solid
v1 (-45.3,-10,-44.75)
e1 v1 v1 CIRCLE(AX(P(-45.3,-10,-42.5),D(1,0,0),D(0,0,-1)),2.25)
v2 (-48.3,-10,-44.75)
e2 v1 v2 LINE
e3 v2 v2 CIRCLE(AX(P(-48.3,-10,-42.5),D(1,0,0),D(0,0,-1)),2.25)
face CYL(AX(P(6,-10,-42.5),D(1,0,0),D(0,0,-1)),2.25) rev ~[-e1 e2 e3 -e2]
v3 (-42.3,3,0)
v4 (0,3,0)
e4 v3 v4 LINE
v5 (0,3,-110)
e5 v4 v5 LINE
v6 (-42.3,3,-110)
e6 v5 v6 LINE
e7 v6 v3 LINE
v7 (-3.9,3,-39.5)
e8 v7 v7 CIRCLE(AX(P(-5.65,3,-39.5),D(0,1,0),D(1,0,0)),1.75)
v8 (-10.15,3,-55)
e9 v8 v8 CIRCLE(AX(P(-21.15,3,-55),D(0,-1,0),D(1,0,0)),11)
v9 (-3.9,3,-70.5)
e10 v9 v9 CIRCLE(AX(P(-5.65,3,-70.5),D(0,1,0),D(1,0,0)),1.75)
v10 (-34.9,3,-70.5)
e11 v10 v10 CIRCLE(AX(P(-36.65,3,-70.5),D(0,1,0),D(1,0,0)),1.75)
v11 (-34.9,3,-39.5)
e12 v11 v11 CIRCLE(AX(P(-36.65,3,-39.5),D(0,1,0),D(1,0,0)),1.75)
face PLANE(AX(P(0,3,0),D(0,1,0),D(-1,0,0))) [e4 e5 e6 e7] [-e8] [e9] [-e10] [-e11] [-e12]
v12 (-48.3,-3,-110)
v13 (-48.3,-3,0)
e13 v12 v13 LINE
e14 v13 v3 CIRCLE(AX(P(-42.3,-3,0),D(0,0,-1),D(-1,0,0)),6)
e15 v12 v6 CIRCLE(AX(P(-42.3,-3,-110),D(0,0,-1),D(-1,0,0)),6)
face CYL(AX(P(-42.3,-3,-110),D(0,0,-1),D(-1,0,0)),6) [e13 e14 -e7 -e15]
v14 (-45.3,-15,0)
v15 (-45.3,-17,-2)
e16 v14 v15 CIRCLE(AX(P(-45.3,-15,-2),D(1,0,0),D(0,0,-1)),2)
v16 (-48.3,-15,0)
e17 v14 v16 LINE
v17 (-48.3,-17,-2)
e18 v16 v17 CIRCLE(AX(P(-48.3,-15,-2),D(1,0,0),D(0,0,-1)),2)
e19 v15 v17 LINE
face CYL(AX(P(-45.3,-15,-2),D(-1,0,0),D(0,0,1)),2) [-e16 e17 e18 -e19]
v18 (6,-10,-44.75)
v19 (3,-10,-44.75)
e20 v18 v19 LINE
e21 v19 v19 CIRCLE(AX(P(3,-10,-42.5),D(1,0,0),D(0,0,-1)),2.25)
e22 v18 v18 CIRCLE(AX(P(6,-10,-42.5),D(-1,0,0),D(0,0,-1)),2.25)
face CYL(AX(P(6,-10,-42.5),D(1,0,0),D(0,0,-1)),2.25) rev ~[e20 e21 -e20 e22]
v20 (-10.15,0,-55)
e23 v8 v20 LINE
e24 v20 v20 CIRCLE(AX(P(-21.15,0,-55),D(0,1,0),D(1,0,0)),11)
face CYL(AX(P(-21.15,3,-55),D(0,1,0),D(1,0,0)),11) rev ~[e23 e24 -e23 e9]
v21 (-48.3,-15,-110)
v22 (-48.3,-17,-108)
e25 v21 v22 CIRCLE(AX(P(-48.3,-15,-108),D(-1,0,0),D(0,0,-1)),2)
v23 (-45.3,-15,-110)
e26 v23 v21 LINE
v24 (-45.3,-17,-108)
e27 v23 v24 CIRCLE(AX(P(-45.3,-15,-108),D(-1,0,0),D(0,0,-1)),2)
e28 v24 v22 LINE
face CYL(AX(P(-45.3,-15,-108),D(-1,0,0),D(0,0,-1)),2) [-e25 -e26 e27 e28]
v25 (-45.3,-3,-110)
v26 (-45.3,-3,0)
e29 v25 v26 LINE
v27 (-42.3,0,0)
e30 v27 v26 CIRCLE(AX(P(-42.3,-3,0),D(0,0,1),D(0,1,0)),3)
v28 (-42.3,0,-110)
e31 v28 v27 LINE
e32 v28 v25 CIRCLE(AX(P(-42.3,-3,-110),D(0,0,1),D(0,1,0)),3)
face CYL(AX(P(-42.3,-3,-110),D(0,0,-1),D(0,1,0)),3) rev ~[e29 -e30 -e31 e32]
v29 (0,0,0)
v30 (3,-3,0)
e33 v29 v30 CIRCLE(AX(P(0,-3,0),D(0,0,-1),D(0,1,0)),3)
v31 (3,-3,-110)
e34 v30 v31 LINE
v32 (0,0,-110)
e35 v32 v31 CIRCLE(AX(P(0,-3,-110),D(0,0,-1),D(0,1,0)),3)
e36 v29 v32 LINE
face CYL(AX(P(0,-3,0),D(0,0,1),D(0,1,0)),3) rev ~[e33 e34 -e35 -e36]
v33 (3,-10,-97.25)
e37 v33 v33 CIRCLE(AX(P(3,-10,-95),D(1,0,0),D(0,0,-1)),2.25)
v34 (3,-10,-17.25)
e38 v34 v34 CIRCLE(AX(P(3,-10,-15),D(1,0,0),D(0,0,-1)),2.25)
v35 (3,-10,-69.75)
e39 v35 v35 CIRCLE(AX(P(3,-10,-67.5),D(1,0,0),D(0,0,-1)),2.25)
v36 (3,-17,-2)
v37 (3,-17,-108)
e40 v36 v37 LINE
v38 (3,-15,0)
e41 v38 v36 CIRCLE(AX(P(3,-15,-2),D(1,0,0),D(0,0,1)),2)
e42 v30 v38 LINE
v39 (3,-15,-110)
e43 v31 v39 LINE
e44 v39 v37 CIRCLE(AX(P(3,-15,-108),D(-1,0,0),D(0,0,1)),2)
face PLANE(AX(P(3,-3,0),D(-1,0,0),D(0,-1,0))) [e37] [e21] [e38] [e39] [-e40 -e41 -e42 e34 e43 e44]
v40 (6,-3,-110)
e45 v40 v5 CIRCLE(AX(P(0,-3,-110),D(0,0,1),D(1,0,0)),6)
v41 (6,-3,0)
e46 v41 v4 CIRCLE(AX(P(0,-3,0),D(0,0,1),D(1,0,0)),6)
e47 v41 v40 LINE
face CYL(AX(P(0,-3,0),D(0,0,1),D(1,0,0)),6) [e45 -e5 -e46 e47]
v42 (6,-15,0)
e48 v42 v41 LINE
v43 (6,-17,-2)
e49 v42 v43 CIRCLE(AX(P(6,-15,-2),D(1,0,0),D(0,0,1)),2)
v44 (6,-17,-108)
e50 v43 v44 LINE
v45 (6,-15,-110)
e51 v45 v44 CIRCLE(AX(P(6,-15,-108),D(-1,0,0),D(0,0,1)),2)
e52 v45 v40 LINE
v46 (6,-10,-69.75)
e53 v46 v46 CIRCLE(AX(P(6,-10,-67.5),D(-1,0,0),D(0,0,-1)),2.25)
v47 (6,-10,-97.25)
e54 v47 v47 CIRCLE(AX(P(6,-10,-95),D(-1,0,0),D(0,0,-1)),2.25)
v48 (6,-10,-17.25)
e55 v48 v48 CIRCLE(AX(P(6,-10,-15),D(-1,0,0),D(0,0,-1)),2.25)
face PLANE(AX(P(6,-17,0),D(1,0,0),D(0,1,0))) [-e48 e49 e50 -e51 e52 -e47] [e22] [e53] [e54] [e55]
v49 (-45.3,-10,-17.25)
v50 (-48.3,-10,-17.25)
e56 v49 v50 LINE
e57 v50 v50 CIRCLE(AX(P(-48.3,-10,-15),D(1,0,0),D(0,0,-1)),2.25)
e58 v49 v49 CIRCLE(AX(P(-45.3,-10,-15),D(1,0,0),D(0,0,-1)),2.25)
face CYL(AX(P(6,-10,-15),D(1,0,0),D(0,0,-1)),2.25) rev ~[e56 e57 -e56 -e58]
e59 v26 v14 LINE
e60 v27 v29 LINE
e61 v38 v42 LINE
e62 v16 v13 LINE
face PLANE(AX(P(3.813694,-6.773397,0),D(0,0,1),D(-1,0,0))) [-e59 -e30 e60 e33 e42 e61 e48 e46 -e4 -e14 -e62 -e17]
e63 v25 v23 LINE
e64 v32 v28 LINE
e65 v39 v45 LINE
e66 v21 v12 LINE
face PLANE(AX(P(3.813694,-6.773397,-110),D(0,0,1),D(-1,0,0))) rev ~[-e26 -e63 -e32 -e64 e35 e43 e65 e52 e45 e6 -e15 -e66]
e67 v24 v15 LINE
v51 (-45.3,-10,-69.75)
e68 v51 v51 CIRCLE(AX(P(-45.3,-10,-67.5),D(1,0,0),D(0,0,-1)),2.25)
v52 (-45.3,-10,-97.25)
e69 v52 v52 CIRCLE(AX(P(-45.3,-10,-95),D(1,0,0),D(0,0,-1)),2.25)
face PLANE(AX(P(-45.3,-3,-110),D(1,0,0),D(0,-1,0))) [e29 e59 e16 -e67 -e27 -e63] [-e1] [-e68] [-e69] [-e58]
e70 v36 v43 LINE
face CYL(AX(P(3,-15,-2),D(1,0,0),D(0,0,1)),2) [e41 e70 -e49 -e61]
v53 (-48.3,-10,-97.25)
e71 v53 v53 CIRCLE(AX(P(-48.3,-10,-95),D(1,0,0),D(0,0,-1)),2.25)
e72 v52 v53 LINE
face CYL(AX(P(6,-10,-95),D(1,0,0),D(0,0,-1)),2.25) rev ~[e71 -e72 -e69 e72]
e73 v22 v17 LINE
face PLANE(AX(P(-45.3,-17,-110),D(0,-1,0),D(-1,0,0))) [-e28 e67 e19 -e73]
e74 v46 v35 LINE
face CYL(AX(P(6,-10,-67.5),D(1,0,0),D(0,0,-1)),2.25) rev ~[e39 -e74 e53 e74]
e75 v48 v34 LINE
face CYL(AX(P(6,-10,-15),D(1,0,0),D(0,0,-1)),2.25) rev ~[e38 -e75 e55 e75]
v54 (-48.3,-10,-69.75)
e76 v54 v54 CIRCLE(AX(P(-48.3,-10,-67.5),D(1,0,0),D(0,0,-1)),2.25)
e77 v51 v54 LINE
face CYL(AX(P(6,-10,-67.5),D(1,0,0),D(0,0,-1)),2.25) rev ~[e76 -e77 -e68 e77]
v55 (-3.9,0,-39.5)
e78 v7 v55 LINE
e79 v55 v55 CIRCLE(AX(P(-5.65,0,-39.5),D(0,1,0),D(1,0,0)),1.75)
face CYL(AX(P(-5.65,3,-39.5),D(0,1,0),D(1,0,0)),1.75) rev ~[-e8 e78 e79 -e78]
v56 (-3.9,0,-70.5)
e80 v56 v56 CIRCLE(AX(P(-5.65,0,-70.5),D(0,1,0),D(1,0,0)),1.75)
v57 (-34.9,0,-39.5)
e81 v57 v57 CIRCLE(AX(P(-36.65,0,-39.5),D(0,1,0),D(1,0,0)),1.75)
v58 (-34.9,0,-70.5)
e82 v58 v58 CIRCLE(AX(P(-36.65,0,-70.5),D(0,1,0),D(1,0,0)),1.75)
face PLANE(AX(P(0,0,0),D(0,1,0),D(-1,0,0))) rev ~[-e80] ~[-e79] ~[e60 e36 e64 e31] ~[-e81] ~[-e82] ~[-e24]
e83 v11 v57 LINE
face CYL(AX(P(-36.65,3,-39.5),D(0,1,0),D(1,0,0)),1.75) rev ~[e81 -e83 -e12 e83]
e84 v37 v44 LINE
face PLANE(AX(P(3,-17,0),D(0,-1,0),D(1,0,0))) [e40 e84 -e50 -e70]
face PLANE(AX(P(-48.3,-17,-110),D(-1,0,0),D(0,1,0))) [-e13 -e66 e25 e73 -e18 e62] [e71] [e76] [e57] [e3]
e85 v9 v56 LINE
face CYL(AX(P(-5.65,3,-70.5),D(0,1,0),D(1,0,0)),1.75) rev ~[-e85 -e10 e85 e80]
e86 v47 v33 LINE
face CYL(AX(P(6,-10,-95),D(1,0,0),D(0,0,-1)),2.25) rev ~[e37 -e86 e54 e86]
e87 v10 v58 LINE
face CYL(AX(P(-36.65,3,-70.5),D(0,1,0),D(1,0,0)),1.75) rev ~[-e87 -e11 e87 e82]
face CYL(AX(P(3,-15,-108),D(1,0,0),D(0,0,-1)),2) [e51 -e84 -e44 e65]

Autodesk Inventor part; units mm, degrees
ref_plane "YZ Plane" through (0, 0, 0) normal (1, 0, 0) x (0, 1, 0)
ref_plane "XZ Plane" through (0, 0, 0) normal (0, 1, 0) x (-1, 0, 0)
ref_plane "XY Plane" through (0, 0, 0) normal (0, 0, 1) x (1, 0, 0)
sketch "Skizze1" plane through (0, 0, 0) normal (0, 1, 0) x (-1, 0, 0)
  line L0 (42.3, 0) -> (0, 0)
  line L1 (0, 0) -> (0, -110)
  line L2 (0, -110) -> (42.3, -110)
  line L3 (42.3, -110) -> (42.3, 0)
  dimension "d0" = 110
  dimension "d1" = 42.3
extrude "Extrusion1" add sketch "Skizze1" along normal blind 3
sketch "Skizze2" plane through (0, 3, 0) normal (0, 1, 0) x (1, 0, 0)
  line L0 (-42.3, 110) -> (-42.3, 0) projected
  line L1 (-42.3, 55) -> (0, 55)
  line L2 (0, 0) -> (0, 110) projected
  line L3 (-42.3, 0) -> (0, 0) projected
  line L4 (-21.15, 0) -> (-21.15, 110)
  line L5 (0, 110) -> (-42.3, 110) projected
  circle A0 centre (-21.15, 55) radius 11
  line L6 (-22.1428, 55) -> (16.9767, 55)
  dimension "d4" = 22
extrude "Extrusion2" cut sketch "Skizze2" against normal blind 4 contours A0 L4 L1 | L1 L4 A0 | A0 L1 L4 | L4 L1 A0
sketch "Skizze3" plane through (0, 3, 0) normal (0, 1, 0) x (1, 0, 0)
  line L0 (-42.3, 110) -> (-42.3, 0) projected
  line L1 (0, 0) -> (0, 110) projected
  line L2 (-42.3, 0) -> (0, 0) projected
  line L3 (-21.15, 0) -> (-21.15, 110)
  line L4 (0, 110) -> (-42.3, 110) projected
  circle A0 centre (-21.15, 55) radius 21.9203 construction
  line L5 (-21.15, 55) -> (-36.65, 55) construction
  line L6 (-36.65, 39.5) -> (-36.65, 70.5) construction
  circle A1 centre (-36.65, 39.5) radius 1.75
  circle A2 centre (-36.65, 70.5) radius 1.75
  circle A3 centre (-5.65, 39.5) radius 1.75
  circle A4 centre (-5.65, 70.5) radius 1.75
  dimension "d7" = 15.5
  dimension "d8" = 31
  dimension "d9" = 3.5
  dimension "d10" = 3.5
extrude "Extrusion3" cut sketch "Skizze3" against normal blind 4 contours A1 | A2 | A3 | A4
sketch "Skizze4" plane through (-45.3, -3, -110) normal (-1, 0, 0) x (0, -1, 0)
  line L0 (0, 110) -> (0, 0)
  line L1 (0, 0) -> (14, 0)
  line L2 (14, 0) -> (14, 110)
  line L3 (14, 110) -> (0, 110)
edge flange "Lasche1" height 20 angle 90 thickness 3 bend radius 3 thickness toward (-1, 0, 0) relief tear relief width 3 relief depth 1.5 edges at (-42.3, 0, -55) wall of the first edge with corners at (-45.3, -3, 0) (-45.3, -3, -110) (-45.3, -17, -110) (-45.3, -17, 0)
bend "Biegung1"
corner "Ecke1"
sketch "Skizze5" plane through (3, -3, 0) normal (1, 0, 0) x (0, 1, 0)
  line L0 (0, -110) -> (0, 0)
  line L1 (0, 0) -> (-14, 0)
  line L2 (-14, 0) -> (-14, -110)
  line L3 (-14, -110) -> (0, -110)
edge flange "Lasche2" height 20 angle 90 thickness 3 bend radius 3 thickness toward (1, 0, 0) relief tear relief width 3 relief depth 1.5 edges at (0, 0, -55) wall of the first edge with corners at (3, -3, -110) (3, -3, 0) (3, -17, 0) (3, -17, -110)
bend "Biegung2"
corner "Ecke2"
sketch "Skizze6" plane through (6, -17, 0) normal (1, 0, 0) x (0, 0, -1)
  line L0 (0, 0) -> (0, 14) projected
  line L1 (0, 7) -> (110, 7)
  line L2 (110, 0) -> (110, 14) projected
  line L3 (110, 0) -> (0, 0) projected
  line L4 (55, 0) -> (55, 14)
  line L5 (0, 14) -> (110, 14) projected
  circle A0 centre (67.5, 7) radius 2.25
  circle A1 centre (42.5, 7) radius 2.25
  circle A2 centre (95, 7) radius 2.25
  circle A3 centre (15, 7) radius 2.25
  point P0 (0, 17)
  point P1 (17.25, 7)
  point P2 (12.75, 7)
  dimension "d35" = 4.5
  dimension "d36" = 4.5
  dimension "d37" = 25
  dimension "d41" = 4.5
  dimension "d42" = 4.5
  dimension "d43" = 80
fillet "Rundung2" radius 2 4 edges at (-46.8, -17, -110) (4.5, -17, -110) (-46.8, -17, 0) (4.5, -17, 0)
extrude "Extrusion5" cut sketch "Skizze6" against normal blind 100 contours A3 L1 | L1 A3 | A1 L1 | L1 A1 | A0 L1 | L1 A0 | A2 L1 | L1 A2
equation "\"d14\" = Stärke"
equation "\"d15\" = BreiteBiegungsfreistellung"
equation "\"d16\" = TiefeBiegungsfreistellung"
equation "\"d17\" = MinimalRest"
equation "\"d18\" = Übergangsradius"
equation "\"d21\" = Biegeradius"
equation "\"d22\" = GrößeEckenfreistellung"
equation "\"d23\" = Abstandsgröße"
equation "\"d24\" = JacobiRadiusGröße"
equation "\"d25\" = BreiteBiegungsfreistellung"
equation "\"d26\" = TiefeBiegungsfreistellung"
equation "\"d27\" = MinimalRest"
equation "\"d28\" = Übergangsradius"
equation "\"d31\" = Biegeradius"
equation "\"d32\" = GrößeEckenfreistellung"
equation "\"d33\" = Abstandsgröße"
equation "\"d34\" = JacobiRadiusGröße"
equation "\"Biegeradius\" = Stärke"
equation "\"BreiteBiegungsfreistellung\" = Stärke"
equation "\"TiefeBiegungsfreistellung\" = 0.5 * Stärke"
equation "\"GrößeEckenfreistellung\" = 4 * Stärke"
equation "\"MinimalRest\" = 2 * Stärke"
equation "\"Übergangsradius\" = Biegeradius"
equation "\"JacobiRadiusGröße\" = Biegeradius"
equation "\"Abstandsgröße\" = Stärke"
equation "\"Stärke\" = 3"
properties part number "Motorhalter_02" material "Aluminium 6061"
